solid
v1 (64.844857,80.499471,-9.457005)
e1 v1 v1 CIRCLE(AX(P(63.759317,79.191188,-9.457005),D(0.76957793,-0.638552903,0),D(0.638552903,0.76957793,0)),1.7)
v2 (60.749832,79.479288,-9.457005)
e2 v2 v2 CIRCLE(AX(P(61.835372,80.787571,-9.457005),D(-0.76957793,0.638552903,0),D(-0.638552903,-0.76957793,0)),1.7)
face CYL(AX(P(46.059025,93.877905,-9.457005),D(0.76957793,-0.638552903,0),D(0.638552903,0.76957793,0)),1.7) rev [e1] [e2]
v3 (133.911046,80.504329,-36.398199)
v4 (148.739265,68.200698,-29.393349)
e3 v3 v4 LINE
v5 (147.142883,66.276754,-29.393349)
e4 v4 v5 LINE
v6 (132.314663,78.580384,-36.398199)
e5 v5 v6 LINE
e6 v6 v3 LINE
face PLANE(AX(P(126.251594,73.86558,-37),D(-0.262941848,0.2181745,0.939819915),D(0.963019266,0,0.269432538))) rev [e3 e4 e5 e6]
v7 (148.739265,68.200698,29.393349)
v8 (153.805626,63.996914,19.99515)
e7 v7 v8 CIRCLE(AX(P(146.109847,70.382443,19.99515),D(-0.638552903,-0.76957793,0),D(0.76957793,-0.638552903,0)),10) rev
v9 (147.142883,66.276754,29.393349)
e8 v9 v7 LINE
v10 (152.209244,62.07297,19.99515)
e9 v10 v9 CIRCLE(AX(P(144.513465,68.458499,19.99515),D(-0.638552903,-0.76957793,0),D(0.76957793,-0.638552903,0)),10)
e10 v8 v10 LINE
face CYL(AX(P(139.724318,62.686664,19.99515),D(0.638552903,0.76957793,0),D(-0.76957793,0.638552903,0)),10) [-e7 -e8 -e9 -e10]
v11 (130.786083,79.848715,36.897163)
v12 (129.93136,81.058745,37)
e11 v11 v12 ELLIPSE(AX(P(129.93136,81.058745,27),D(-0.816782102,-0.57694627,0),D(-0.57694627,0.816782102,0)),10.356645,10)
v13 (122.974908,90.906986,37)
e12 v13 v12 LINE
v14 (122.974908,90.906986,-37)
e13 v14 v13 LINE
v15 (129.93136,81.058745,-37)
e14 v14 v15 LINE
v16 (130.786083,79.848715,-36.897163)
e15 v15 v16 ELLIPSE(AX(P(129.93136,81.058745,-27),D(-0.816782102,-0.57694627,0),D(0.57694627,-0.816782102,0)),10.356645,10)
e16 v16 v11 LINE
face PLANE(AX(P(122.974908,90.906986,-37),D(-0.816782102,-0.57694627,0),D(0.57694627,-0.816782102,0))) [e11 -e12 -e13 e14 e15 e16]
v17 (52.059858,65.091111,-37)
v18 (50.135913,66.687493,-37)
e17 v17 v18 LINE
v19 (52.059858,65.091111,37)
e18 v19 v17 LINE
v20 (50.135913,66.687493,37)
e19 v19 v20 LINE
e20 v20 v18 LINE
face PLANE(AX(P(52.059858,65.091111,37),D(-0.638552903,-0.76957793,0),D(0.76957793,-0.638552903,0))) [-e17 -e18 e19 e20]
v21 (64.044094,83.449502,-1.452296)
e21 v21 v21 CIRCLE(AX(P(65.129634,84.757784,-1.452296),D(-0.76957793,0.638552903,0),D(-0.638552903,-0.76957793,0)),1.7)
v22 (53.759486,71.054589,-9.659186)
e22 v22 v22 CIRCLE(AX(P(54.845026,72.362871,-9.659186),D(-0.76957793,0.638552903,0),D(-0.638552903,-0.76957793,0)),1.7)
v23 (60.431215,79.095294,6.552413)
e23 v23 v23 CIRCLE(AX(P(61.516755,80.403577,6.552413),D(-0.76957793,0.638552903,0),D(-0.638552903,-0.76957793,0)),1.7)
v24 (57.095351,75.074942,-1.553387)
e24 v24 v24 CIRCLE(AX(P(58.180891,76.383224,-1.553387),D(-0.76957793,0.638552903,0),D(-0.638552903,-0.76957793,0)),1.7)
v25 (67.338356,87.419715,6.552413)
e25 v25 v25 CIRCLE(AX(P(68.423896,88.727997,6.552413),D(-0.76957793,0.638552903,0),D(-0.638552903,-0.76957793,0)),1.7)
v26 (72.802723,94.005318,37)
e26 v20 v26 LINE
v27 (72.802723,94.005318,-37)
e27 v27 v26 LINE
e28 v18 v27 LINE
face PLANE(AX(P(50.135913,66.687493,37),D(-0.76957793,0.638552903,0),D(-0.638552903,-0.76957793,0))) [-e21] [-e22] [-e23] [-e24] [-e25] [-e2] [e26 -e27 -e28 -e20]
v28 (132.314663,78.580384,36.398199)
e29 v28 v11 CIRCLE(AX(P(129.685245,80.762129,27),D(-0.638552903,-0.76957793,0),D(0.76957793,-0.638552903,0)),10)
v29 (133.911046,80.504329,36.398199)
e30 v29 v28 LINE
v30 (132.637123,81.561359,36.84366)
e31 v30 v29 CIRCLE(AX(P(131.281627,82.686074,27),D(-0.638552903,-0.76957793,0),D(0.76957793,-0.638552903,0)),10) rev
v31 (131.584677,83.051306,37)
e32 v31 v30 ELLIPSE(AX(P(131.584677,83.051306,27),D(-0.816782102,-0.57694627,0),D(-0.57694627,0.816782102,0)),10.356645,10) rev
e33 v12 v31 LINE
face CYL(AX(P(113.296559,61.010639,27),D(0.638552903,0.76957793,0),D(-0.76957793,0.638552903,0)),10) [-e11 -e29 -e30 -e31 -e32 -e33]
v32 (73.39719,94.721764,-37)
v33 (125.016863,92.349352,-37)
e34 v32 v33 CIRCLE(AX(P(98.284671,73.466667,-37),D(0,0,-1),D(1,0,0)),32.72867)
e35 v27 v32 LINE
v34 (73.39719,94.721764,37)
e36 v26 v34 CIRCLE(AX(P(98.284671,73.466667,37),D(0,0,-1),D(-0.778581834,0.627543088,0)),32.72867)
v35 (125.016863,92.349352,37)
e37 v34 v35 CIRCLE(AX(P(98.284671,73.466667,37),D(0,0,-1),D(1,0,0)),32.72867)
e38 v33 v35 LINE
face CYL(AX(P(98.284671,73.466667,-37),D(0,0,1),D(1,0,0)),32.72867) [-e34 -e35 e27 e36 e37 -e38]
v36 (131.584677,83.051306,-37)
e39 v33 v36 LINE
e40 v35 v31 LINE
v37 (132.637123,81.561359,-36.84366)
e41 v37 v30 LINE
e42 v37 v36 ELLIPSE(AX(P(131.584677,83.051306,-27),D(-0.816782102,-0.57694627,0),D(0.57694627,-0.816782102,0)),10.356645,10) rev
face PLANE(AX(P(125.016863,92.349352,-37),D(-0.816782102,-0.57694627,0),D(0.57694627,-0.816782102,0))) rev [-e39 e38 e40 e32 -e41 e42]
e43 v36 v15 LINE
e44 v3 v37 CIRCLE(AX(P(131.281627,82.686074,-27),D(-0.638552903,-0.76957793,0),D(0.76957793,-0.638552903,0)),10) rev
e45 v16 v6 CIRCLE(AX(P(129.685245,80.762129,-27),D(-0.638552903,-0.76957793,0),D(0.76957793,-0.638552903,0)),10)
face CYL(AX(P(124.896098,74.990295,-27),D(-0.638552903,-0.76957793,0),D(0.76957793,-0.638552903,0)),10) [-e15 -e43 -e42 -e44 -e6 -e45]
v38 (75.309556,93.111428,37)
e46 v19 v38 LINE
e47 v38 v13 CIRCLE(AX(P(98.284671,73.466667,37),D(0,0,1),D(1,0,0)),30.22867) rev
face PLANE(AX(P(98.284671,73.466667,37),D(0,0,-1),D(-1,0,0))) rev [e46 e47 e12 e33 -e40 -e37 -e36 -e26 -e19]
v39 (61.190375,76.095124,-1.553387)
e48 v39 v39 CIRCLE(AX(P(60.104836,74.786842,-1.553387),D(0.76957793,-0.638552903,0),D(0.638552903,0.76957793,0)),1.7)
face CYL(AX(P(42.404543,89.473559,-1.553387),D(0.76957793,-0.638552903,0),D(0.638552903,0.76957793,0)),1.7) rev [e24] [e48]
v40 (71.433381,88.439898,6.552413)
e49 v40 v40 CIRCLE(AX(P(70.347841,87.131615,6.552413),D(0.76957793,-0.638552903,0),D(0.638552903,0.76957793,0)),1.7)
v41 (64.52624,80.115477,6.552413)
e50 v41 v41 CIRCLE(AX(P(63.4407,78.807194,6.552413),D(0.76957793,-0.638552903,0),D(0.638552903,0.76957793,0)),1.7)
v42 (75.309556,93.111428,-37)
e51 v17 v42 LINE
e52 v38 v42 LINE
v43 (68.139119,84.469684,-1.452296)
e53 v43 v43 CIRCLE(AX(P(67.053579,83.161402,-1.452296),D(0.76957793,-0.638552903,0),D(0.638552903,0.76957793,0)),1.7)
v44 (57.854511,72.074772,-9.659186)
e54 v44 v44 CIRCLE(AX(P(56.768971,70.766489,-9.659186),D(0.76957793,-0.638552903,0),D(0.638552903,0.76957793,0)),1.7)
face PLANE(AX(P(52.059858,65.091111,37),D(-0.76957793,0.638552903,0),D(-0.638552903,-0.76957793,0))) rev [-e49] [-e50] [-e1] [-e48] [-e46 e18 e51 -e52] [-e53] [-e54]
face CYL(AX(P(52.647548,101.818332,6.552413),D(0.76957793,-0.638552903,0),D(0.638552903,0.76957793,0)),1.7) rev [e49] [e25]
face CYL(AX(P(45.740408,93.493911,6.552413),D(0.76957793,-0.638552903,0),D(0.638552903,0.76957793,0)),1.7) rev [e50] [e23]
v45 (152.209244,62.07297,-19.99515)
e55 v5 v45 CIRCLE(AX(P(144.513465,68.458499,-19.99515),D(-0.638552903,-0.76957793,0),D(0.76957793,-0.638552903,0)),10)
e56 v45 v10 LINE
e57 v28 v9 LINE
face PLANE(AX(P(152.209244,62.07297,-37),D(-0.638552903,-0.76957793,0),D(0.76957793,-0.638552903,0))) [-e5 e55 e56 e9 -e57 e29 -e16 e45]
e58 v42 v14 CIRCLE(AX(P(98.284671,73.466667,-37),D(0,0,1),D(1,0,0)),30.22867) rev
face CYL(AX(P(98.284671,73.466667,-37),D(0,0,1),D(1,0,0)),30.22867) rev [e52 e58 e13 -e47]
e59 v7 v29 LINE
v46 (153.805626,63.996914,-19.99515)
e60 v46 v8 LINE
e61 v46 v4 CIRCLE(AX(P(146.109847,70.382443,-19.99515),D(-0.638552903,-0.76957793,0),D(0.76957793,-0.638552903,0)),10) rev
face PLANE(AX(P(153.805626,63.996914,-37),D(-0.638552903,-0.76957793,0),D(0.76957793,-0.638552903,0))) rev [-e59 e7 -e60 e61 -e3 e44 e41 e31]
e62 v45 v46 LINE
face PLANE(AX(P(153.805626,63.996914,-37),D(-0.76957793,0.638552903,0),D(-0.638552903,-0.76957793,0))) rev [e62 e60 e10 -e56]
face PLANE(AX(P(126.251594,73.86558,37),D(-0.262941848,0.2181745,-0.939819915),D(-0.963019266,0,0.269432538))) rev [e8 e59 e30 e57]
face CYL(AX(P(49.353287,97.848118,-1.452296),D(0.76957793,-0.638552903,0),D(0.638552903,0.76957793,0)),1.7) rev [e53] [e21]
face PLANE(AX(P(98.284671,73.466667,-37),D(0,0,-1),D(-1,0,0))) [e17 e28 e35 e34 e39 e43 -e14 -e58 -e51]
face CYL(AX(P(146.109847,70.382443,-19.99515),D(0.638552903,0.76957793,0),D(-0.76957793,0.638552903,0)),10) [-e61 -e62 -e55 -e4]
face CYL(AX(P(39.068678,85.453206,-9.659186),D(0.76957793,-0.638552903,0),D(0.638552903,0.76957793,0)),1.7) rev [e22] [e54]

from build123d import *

# Parameters (mm, degrees)
ESTRUSIONE_SOTTILE1_START = -37
ESTRUSIONE_SOTTILE1_DEPTH = 74
SCHIZZO2_R                = 1.7
TAGLIO_ESTRUSIONE2_DEPTH  = 23
TAGLIO_ESTRUSIONE4_DEPTH  = 10
RACCORDO1_R               = 10


# Read off the part's stored shape, not the designer's step: Estrusione-Sottile1
with BuildPart() as part:
    # Estrusione-Sottile1 outline → Estrusione-Sottile1 (new body)
    with BuildSketch(Plane.XY.offset(ESTRUSIONE_SOTTILE1_START)):
        with BuildLine():
            ThreePointArc((75.309556173, 93.111427552), (99.681203079, 103.663061306), (122.974907994, 90.906985924))
            Line((122.974907994, 90.906985924), (130.786083182, 79.848715119))
            Line((130.786083182, 79.848715119), (152.209243946, 62.072969532))
            Line((152.209243946, 62.072969532), (153.805626203, 63.996914357))
            Line((153.805626203, 63.996914357), (132.637123428, 81.561358928))
            Line((132.637123428, 81.561358928), (125.016863249, 92.349351598))
            ThreePointArc((125.016863249, 92.349351598), (99.3221362, 106.178890254), (72.802722922, 94.005318182))
            Line((72.802722922, 94.005318182), (50.135913498, 66.687493457))
            Line((50.135913498, 66.687493457), (52.059858323, 65.0911112))
            Line((52.059858323, 65.0911112), (75.309556173, 93.111427552))
        make_face()
    extrude(amount=ESTRUSIONE_SOTTILE1_DEPTH)

    # Schizzo2 → Taglio-Estrusione2 (cut)
    with BuildSketch(Plane(origin=(-1.154366895, 0.957829354, 0), x_dir=(0, 0, -1), z_dir=(0.76957792998473, -0.6385529028047858, 0))):
        with Locations(Location((-6.552412565, 111.975385882, 0), (0, 0, 90))):
            Circle(SCHIZZO2_R)
        with Locations(Location((-6.552412565, 101.158520834, 0), (0, 0, 90))):
            Circle(SCHIZZO2_R)
        with Locations(Location((1.452296176, 106.816436865, 0), (0, 0, 90))):
            Circle(SCHIZZO2_R)
        with Locations(Location((9.457004918, 101.657487848, 0), (0, 0, 90))):
            Circle(SCHIZZO2_R)
        with Locations(Location((1.553386665, 95.93442008, 0), (0, 0, 90))):
            Circle(SCHIZZO2_R)
        with Locations(Location((9.659185895, 90.710319326, 0), (0, 0, 90))):
            Circle(SCHIZZO2_R)
    extrude(amount=-TAGLIO_ESTRUSIONE2_DEPTH, mode=Mode.SUBTRACT)

    # Schizzo3 → Taglio-Estrusione4 (cut)
    with BuildSketch(Plane(origin=(94.163336629, 113.484764324, 0), x_dir=(0.769577929984725, -0.6385529028047917, 0), z_dir=(0.6385529028047917, 0.769577929984725, 0))):
        Polygon((49.993360387, -37), (77.5, -27), (77.5, -37), align=None)
        Polygon((49.993360387, 37), (77.5, 27), (77.5, 37), align=None)
    extrude(amount=-TAGLIO_ESTRUSIONE4_DEPTH, mode=Mode.SUBTRACT)

    # Raccordo1
    raccordo1_edges = [part.edges().sort_by_distance(p)[0] for p in [
        (131.8389323, 80.599386516, -37),
        (131.8389323, 80.599386516, 37),
        (153.007435074, 63.034941944, -27),
        (153.007435074, 63.034941944, 27),
    ]]
    fillet(raccordo1_edges, radius=RACCORDO1_R)


solid = part.part
